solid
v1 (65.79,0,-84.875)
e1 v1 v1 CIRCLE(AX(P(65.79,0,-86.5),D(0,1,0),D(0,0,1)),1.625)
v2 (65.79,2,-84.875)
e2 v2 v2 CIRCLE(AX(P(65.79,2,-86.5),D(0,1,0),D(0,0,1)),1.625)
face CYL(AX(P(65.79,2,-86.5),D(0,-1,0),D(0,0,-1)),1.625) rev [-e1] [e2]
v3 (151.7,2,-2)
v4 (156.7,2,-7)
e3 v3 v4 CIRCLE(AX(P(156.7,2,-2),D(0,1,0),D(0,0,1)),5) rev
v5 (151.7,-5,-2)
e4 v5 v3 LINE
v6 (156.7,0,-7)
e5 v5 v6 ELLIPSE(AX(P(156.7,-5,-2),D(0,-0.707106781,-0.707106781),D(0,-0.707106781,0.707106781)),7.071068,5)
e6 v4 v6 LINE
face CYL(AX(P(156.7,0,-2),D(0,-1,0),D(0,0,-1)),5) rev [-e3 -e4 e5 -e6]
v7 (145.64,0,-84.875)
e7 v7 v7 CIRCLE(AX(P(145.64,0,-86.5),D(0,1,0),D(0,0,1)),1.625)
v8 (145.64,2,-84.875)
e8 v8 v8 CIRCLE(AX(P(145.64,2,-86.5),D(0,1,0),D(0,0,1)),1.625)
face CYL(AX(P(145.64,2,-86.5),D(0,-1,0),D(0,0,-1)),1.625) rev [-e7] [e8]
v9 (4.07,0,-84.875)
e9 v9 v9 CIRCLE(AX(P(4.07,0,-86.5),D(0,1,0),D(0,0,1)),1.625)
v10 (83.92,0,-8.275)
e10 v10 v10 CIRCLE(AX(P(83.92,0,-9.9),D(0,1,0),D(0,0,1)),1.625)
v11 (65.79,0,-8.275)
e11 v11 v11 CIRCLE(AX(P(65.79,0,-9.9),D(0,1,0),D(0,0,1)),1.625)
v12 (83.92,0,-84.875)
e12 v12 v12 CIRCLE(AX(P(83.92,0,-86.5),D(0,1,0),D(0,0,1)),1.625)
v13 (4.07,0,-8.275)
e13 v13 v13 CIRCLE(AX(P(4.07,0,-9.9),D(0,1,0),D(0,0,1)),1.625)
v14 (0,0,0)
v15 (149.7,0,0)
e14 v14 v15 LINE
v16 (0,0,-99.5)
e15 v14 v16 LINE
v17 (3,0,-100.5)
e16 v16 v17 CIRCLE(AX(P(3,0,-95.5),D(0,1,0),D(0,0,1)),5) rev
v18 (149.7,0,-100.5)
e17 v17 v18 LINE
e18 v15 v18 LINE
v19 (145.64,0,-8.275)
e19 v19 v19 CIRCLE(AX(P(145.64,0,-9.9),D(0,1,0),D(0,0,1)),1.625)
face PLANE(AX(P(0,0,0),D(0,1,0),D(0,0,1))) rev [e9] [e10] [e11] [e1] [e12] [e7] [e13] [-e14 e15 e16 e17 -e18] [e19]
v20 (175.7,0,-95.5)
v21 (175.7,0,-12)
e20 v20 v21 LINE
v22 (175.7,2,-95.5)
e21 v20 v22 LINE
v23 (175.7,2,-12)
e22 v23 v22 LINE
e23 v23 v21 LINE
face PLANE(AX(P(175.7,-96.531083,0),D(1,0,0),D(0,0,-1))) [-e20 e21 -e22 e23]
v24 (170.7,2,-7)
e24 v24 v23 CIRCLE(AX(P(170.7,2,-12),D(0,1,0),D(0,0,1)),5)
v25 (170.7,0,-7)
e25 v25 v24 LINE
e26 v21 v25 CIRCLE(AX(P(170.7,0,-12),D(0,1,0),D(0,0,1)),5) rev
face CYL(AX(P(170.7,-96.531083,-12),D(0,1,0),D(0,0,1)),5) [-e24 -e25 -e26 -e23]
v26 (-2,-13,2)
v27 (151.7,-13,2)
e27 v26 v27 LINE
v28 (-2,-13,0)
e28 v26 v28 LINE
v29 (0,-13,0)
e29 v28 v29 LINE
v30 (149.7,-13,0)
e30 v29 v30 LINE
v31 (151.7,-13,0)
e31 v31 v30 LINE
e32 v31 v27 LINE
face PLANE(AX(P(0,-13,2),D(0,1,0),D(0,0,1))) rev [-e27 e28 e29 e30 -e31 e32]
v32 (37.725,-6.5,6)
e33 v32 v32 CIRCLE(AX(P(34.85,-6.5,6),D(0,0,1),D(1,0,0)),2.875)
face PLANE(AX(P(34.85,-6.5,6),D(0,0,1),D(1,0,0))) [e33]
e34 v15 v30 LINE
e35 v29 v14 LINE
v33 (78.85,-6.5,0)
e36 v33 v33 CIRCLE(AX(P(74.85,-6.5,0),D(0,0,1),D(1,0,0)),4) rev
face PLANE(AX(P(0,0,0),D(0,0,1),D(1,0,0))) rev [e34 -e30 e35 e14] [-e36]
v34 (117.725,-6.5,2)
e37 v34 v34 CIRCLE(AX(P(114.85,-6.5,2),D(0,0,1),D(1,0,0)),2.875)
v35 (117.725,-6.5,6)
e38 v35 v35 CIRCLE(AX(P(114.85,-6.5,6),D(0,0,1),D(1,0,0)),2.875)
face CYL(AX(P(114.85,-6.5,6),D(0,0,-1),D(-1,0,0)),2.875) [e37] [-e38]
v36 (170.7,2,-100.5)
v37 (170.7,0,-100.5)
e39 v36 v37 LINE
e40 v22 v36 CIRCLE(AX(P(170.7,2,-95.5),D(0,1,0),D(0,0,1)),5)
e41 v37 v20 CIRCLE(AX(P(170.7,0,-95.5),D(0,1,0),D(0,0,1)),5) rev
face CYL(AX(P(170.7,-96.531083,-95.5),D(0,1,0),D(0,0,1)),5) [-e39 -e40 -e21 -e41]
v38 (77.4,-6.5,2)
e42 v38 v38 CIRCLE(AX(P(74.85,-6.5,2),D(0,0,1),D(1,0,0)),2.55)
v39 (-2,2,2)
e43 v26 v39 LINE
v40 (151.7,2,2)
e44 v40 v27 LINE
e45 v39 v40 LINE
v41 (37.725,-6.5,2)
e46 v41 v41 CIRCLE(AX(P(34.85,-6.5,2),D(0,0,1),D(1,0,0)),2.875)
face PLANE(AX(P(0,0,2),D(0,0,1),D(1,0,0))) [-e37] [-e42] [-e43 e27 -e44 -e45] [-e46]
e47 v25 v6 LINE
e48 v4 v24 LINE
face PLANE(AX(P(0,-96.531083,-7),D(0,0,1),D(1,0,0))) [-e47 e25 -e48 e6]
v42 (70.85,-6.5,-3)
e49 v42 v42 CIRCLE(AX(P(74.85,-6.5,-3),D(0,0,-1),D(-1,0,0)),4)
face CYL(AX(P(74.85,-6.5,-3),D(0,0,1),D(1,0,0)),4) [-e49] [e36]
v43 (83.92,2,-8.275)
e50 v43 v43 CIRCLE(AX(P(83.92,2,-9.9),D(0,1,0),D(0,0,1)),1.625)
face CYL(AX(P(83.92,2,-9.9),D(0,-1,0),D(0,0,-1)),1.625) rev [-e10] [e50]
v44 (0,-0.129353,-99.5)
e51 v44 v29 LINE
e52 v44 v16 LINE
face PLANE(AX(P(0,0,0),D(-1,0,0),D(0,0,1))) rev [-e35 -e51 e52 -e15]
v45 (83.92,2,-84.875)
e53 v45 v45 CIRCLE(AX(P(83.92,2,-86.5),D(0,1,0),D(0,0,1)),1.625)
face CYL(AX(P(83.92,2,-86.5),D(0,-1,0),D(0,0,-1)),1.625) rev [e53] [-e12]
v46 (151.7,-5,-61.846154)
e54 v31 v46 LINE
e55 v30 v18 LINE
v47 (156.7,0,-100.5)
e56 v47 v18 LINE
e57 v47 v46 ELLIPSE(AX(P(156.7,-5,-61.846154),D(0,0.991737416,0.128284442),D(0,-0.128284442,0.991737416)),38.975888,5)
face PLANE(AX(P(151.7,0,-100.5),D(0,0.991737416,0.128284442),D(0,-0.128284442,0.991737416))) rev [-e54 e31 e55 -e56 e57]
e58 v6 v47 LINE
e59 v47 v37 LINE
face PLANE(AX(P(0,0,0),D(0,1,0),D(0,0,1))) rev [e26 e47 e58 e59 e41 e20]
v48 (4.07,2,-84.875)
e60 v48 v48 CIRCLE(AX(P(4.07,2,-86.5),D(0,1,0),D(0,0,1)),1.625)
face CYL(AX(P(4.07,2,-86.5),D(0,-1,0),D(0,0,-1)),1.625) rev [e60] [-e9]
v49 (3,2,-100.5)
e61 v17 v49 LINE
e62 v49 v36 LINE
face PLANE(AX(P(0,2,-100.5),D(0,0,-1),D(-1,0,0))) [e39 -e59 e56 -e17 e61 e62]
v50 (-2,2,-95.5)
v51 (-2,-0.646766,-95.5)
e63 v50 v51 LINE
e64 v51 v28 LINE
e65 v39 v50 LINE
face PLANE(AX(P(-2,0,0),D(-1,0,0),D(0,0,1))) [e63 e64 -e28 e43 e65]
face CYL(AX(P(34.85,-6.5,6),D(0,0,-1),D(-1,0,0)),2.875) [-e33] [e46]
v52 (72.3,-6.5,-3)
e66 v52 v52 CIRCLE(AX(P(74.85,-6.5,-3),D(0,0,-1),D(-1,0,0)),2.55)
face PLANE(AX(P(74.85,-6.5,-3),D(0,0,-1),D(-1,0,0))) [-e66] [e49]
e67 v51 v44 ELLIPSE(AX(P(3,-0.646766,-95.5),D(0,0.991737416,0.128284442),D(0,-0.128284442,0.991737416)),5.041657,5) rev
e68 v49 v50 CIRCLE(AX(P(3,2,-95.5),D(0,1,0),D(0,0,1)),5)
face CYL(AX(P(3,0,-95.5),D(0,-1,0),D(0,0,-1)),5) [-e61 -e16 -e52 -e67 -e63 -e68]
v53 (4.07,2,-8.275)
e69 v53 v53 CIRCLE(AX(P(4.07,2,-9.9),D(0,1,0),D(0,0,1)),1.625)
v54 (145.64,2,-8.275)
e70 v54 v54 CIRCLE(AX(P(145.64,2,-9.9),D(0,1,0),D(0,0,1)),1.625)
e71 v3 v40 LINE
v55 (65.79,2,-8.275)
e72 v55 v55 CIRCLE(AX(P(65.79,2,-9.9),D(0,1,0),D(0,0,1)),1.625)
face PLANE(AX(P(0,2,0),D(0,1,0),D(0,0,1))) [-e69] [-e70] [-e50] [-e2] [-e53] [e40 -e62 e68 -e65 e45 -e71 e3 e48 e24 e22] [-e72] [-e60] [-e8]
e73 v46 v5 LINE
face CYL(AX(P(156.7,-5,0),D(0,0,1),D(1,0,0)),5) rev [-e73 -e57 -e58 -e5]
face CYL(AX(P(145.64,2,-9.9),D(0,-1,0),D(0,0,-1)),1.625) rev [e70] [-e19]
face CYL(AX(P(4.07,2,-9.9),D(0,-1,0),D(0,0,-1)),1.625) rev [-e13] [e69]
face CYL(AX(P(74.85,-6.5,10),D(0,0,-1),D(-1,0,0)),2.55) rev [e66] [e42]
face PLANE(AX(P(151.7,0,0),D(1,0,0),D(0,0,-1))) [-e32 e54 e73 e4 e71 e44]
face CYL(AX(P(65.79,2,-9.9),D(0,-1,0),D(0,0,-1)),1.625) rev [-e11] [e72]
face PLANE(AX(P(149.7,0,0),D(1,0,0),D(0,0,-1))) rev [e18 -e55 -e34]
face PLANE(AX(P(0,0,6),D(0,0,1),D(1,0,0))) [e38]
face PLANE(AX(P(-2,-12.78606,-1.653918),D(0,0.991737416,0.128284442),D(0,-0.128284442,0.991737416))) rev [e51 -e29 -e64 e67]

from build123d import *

# Parameters (mm, degrees)
SKETCH1_W           = 10
SKETCH1_H           = 100.5
SKETCH1_R           = 1.625
SKETCH1_W_2         = 69.85
BOSS_EXTRUDE1_DEPTH = 2
SKETCH3_W           = 149.7
SKETCH3_H           = 2
BOSS_EXTRUDE2_DEPTH = 2
SKETCH4_W           = 100.5
SKETCH4_H           = 2
BOSS_EXTRUDE3_DEPTH = 2
BOSS_EXTRUDE4_DEPTH = 2
SKETCH6_W           = 8
SKETCH6_H           = 15
BOSS_EXTRUDE5_DEPTH = 3
CUT_EXTRUDE1_DEPTH  = 10
FILLET1_R           = 3
CUT_EXTRUDE2_DEPTH  = 10
BOSS_EXTRUDE6_START = 3
SKETCH10_R          = 4
SKETCH10_R_2        = 2.55
BOSS_EXTRUDE6_DEPTH = 3
SKETCH12_R          = 2.875
BOSS_EXTRUDE7_DEPTH = 4
SKETCH13_W          = 10.946886228
SKETCH13_H          = 17.580383234
SKETCH13_W_2        = 10.296538922
SKETCH13_H_2        = 23.433508982
CUT_EXTRUDE3_DEPTH  = 43
SKETCH15_W          = 24
SKETCH15_H          = 93.5
BOSS_EXTRUDE8_DEPTH = 2
FILLET2_R           = 5
FILLET3_R           = 5


with BuildPart() as part:
    # Sketch1 → Boss-Extrude1 (new body)
    # profile 1 of 3: a face of its own
    with BuildSketch(Plane(origin=(0, 0, 0), x_dir=(1, 0, 0), z_dir=(0, 1, 0))):
        with Locations((74.85, 50.25)):
            Rectangle(SKETCH1_W, SKETCH1_H)
    # profile 2 of 3: a face of its own
    with BuildSketch(Plane(origin=(0, 0, 0), x_dir=(1, 0, 0), z_dir=(0, 1, 0))):
        Polygon((0, 0), (69.85, 0), (69.85, 100.5), (0, 100.5), (0, 86.5), align=None)
        with Locations(Location((4.07, 9.9, 0), (0, 0, 270))):
            Circle(SKETCH1_R, mode=Mode.SUBTRACT)
        with BuildLine():
            ThreePointArc((64.165, 9.9), (64.640951481, 11.049048519), (65.79, 11.525))
            ThreePointArc((65.79, 11.525), (66.939048519, 11.049048519), (67.415, 9.9))
            ThreePointArc((67.415, 9.9), (65.79, 8.275), (64.165, 9.9))
        make_face(mode=Mode.SUBTRACT)
        with BuildLine():
            ThreePointArc((5.695, 86.5), (4.07, 84.875), (2.445, 86.5))
            ThreePointArc((2.445, 86.5), (4.07, 88.125), (5.695, 86.5))
        make_face(mode=Mode.SUBTRACT)
        with BuildLine():
            ThreePointArc((65.79, 84.875), (64.640951481, 85.350951481), (64.165, 86.5))
            ThreePointArc((64.165, 86.5), (65.79, 88.125), (67.415, 86.5))
            ThreePointArc((67.415, 86.5), (66.939048519, 85.350951481), (65.79, 84.875))
        make_face(mode=Mode.SUBTRACT)
    # profile 3 of 3: a face of its own
    with BuildSketch(Plane(origin=(0, 0, 0), x_dir=(1, 0, 0), z_dir=(0, 1, 0))):
        with Locations((114.775, 50.25)):
            Rectangle(SKETCH1_W_2, SKETCH1_H)
        with Locations(Location((83.92, 9.9, 0), (0, 0, 270))):
            Circle(SKETCH1_R, mode=Mode.SUBTRACT)
        with Locations(Location((145.64, 9.9, 0), (0, 0, 270))):
            Circle(SKETCH1_R, mode=Mode.SUBTRACT)
        with Locations(Location((83.92, 86.5, 0), (0, 0, 270))):
            Circle(SKETCH1_R, mode=Mode.SUBTRACT)
        with Locations(Location((145.64, 86.5, 0), (0, 0, 270))):
            Circle(SKETCH1_R, mode=Mode.SUBTRACT)
    extrude(amount=BOSS_EXTRUDE1_DEPTH)

    # Sketch3 → Boss-Extrude2 (add)
    with BuildSketch(Plane.XY):
        Polygon((-10, 2), (-10, -13), (159.7, -13), (159.7, 2), (149.7, 2), (149.7, 0), (0, 0), (0, 2), align=None)
        with Locations((74.85, 1)):
            Rectangle(SKETCH3_W, SKETCH3_H)
    extrude(amount=BOSS_EXTRUDE2_DEPTH)

    # Sketch4 → Boss-Extrude3 (add)
    with BuildSketch(Plane.ZY):
        Polygon((0, 0), (-100.5, 0), (0, -13), align=None)
        with Locations((-50.25, 1)):
            Rectangle(SKETCH4_W, SKETCH4_H)
    extrude(amount=BOSS_EXTRUDE3_DEPTH)

    # Sketch5 → Boss-Extrude4 (add)
    with BuildSketch(Plane(origin=(149.7, 0, 0), x_dir=(0, 0, -1), z_dir=(1, 0, 0))):
        Polygon((100.5, 0), (0, -13), (0, 2), (100.5, 2), align=None)
    extrude(amount=BOSS_EXTRUDE4_DEPTH)

    # Sketch6 → Boss-Extrude5 (add)
    with BuildSketch(Plane(origin=(0, 0, 0), x_dir=(-1, 0, 0), z_dir=(0, 0, -1))):
        with Locations((6, -5.5)):
            Rectangle(SKETCH6_W, SKETCH6_H)
        with Locations((-155.7, -5.5)):
            Rectangle(SKETCH6_W, SKETCH6_H)
    extrude(amount=BOSS_EXTRUDE5_DEPTH)

    # Sketch8 → Cut-Extrude1 (cut)
    with BuildSketch(Plane(origin=(0, 0, -3), x_dir=(-1, 0, 0), z_dir=(0, 0, -1))):
        with BuildLine():
            ThreePointArc((-153.15, -5.5), (-155.7, -2.95), (-158.25, -5.5))
            Line((-158.25, -5.5), (-153.15, -5.5))
        make_face()
        with BuildLine():
            Line((-153.15, -5.5), (-158.25, -5.5))
            ThreePointArc((-158.25, -5.5), (-155.7, -8.05), (-153.15, -5.5))
        make_face()
        with BuildLine():
            ThreePointArc((3.45, -5.5), (6, -8.05), (8.55, -5.5))
            Line((8.55, -5.5), (3.45, -5.5))
        make_face()
        with BuildLine():
            Line((3.45, -5.5), (8.55, -5.5))
            ThreePointArc((8.55, -5.5), (6, -2.95), (3.45, -5.5))
        make_face()
    extrude(amount=-CUT_EXTRUDE1_DEPTH, mode=Mode.SUBTRACT)

    # Fillet1
    fillet1_edges = [part.edges().sort_by_distance(p)[0] for p in [
        (159.7, 2, -0.5),
        (-10, 2, -0.5),
        (-10, -13, -0.5),
        (159.7, -13, -0.5),
    ]]
    fillet(fillet1_edges, radius=FILLET1_R)

    # Sketch9 → Cut-Extrude2 (cut)
    with BuildSketch(Plane(origin=(0, 0, 0), x_dir=(-1, 0, 0), z_dir=(0, 0, -1))):
        with BuildLine():
            ThreePointArc((-72.3, -6.5), (-73.046877708, -4.696877708), (-74.85, -3.95))
            Line((-74.85, -3.95), (-74.85, -9.05))
            ThreePointArc((-74.85, -9.05), (-73.046877708, -8.303122292), (-72.3, -6.5))
        make_face()
        with BuildLine():
            Line((-74.85, -9.05), (-74.85, -3.95))
            ThreePointArc((-74.85, -3.95), (-77.4, -6.5), (-74.85, -9.05))
        make_face()
    extrude(amount=-CUT_EXTRUDE2_DEPTH, mode=Mode.SUBTRACT)

    # Sketch10 → Boss-Extrude6 (add)
    with BuildSketch(Plane(origin=(0, 0, 0), x_dir=(-1, 0, 0), z_dir=(0, 0, -1)).offset(BOSS_EXTRUDE6_START)):
        with Locations(Location((-74.85, -6.5, 0), (0, 0, 180))):
            Circle(SKETCH10_R)
        with Locations((-74.85, -6.5)):
            Circle(SKETCH10_R_2, mode=Mode.SUBTRACT)
    extrude(amount=-BOSS_EXTRUDE6_DEPTH)

    # Sketch12 → Boss-Extrude7 (add)
    with BuildSketch(Plane.XY.offset(2)):
        with Locations((34.85, -6.5)):
            Circle(SKETCH12_R)
        with Locations((114.85, -6.5)):
            Circle(SKETCH12_R)
    extrude(amount=BOSS_EXTRUDE7_DEPTH)

    # Sketch13 → Cut-Extrude3 (cut)
    with BuildSketch(Plane(origin=(0, 0, -3), x_dir=(-1, 0, 0), z_dir=(0, 0, -1))):
        with Locations((-157.173443114, -6.790191617)):
            Rectangle(SKETCH13_W, SKETCH13_H)
        with Locations((7.148269461, -9.716754491)):
            Rectangle(SKETCH13_W_2, SKETCH13_H_2)
    extrude(amount=-CUT_EXTRUDE3_DEPTH, mode=Mode.SUBTRACT)

    # Sketch15 → Boss-Extrude8 (add)
    with BuildSketch(Plane(origin=(0, 2, 0), x_dir=(1, 0, 0), z_dir=(0, 1, 0))):
        with Locations((163.7, 53.75)):
            Rectangle(SKETCH15_W, SKETCH15_H)
    extrude(amount=-BOSS_EXTRUDE8_DEPTH)

    # Fillet2
    # the kernel refuses this fillet: 5 mm, written as the material it adds along each edge
    with BuildSketch(Plane(origin=(151.7, 2, -7), x_dir=(1, 0, 0), z_dir=(0, -1, 0))) as fillet2_piece_1:
        with BuildLine():
            CenterArc((FILLET2_R, FILLET2_R), FILLET2_R, 180, 90)
            Line((0, FILLET2_R), (0, 0))
            Line((0, 0), (FILLET2_R, 0))
        make_face()
    extrude(amount=2)
    # the kernel refuses this fillet: 5 mm, written as the material it takes off along each edge
    with BuildSketch(Plane(origin=(175.7, 14.5, -100.5), x_dir=(-1, 0, 0), z_dir=(0, -1, 0)), Plane(origin=(175.7, 14.5, -7), x_dir=(0, 0, -1), z_dir=(0, -1, 0))) as fillet2_2_piece_1:
        with BuildLine():
            CenterArc((FILLET2_R, -FILLET2_R), FILLET2_R, 90, 90)
            Line((0, -FILLET2_R), (0, 0))
            Line((0, 0), (FILLET2_R, 0))
        make_face()
    extrude(amount=27, mode=Mode.SUBTRACT)
    with BuildSketch(Plane(origin=(-2, 14.5, -100.5), x_dir=(1, 0, 0), z_dir=(0, -1, 0))) as fillet2_2_piece_2:
        with BuildLine():
            CenterArc((FILLET2_R, FILLET2_R), FILLET2_R, 180, 90)
            Line((0, FILLET2_R), (0, 0))
            Line((0, 0), (FILLET2_R, 0))
        make_face()
    extrude(amount=27, mode=Mode.SUBTRACT)

    # Fillet3
    fillet3_edges = [part.edges().sort_by_distance(p)[0] for p in [
        (151.7, 0, -51.25),
    ]]
    fillet(fillet3_edges, radius=FILLET3_R)


solid = part.part
